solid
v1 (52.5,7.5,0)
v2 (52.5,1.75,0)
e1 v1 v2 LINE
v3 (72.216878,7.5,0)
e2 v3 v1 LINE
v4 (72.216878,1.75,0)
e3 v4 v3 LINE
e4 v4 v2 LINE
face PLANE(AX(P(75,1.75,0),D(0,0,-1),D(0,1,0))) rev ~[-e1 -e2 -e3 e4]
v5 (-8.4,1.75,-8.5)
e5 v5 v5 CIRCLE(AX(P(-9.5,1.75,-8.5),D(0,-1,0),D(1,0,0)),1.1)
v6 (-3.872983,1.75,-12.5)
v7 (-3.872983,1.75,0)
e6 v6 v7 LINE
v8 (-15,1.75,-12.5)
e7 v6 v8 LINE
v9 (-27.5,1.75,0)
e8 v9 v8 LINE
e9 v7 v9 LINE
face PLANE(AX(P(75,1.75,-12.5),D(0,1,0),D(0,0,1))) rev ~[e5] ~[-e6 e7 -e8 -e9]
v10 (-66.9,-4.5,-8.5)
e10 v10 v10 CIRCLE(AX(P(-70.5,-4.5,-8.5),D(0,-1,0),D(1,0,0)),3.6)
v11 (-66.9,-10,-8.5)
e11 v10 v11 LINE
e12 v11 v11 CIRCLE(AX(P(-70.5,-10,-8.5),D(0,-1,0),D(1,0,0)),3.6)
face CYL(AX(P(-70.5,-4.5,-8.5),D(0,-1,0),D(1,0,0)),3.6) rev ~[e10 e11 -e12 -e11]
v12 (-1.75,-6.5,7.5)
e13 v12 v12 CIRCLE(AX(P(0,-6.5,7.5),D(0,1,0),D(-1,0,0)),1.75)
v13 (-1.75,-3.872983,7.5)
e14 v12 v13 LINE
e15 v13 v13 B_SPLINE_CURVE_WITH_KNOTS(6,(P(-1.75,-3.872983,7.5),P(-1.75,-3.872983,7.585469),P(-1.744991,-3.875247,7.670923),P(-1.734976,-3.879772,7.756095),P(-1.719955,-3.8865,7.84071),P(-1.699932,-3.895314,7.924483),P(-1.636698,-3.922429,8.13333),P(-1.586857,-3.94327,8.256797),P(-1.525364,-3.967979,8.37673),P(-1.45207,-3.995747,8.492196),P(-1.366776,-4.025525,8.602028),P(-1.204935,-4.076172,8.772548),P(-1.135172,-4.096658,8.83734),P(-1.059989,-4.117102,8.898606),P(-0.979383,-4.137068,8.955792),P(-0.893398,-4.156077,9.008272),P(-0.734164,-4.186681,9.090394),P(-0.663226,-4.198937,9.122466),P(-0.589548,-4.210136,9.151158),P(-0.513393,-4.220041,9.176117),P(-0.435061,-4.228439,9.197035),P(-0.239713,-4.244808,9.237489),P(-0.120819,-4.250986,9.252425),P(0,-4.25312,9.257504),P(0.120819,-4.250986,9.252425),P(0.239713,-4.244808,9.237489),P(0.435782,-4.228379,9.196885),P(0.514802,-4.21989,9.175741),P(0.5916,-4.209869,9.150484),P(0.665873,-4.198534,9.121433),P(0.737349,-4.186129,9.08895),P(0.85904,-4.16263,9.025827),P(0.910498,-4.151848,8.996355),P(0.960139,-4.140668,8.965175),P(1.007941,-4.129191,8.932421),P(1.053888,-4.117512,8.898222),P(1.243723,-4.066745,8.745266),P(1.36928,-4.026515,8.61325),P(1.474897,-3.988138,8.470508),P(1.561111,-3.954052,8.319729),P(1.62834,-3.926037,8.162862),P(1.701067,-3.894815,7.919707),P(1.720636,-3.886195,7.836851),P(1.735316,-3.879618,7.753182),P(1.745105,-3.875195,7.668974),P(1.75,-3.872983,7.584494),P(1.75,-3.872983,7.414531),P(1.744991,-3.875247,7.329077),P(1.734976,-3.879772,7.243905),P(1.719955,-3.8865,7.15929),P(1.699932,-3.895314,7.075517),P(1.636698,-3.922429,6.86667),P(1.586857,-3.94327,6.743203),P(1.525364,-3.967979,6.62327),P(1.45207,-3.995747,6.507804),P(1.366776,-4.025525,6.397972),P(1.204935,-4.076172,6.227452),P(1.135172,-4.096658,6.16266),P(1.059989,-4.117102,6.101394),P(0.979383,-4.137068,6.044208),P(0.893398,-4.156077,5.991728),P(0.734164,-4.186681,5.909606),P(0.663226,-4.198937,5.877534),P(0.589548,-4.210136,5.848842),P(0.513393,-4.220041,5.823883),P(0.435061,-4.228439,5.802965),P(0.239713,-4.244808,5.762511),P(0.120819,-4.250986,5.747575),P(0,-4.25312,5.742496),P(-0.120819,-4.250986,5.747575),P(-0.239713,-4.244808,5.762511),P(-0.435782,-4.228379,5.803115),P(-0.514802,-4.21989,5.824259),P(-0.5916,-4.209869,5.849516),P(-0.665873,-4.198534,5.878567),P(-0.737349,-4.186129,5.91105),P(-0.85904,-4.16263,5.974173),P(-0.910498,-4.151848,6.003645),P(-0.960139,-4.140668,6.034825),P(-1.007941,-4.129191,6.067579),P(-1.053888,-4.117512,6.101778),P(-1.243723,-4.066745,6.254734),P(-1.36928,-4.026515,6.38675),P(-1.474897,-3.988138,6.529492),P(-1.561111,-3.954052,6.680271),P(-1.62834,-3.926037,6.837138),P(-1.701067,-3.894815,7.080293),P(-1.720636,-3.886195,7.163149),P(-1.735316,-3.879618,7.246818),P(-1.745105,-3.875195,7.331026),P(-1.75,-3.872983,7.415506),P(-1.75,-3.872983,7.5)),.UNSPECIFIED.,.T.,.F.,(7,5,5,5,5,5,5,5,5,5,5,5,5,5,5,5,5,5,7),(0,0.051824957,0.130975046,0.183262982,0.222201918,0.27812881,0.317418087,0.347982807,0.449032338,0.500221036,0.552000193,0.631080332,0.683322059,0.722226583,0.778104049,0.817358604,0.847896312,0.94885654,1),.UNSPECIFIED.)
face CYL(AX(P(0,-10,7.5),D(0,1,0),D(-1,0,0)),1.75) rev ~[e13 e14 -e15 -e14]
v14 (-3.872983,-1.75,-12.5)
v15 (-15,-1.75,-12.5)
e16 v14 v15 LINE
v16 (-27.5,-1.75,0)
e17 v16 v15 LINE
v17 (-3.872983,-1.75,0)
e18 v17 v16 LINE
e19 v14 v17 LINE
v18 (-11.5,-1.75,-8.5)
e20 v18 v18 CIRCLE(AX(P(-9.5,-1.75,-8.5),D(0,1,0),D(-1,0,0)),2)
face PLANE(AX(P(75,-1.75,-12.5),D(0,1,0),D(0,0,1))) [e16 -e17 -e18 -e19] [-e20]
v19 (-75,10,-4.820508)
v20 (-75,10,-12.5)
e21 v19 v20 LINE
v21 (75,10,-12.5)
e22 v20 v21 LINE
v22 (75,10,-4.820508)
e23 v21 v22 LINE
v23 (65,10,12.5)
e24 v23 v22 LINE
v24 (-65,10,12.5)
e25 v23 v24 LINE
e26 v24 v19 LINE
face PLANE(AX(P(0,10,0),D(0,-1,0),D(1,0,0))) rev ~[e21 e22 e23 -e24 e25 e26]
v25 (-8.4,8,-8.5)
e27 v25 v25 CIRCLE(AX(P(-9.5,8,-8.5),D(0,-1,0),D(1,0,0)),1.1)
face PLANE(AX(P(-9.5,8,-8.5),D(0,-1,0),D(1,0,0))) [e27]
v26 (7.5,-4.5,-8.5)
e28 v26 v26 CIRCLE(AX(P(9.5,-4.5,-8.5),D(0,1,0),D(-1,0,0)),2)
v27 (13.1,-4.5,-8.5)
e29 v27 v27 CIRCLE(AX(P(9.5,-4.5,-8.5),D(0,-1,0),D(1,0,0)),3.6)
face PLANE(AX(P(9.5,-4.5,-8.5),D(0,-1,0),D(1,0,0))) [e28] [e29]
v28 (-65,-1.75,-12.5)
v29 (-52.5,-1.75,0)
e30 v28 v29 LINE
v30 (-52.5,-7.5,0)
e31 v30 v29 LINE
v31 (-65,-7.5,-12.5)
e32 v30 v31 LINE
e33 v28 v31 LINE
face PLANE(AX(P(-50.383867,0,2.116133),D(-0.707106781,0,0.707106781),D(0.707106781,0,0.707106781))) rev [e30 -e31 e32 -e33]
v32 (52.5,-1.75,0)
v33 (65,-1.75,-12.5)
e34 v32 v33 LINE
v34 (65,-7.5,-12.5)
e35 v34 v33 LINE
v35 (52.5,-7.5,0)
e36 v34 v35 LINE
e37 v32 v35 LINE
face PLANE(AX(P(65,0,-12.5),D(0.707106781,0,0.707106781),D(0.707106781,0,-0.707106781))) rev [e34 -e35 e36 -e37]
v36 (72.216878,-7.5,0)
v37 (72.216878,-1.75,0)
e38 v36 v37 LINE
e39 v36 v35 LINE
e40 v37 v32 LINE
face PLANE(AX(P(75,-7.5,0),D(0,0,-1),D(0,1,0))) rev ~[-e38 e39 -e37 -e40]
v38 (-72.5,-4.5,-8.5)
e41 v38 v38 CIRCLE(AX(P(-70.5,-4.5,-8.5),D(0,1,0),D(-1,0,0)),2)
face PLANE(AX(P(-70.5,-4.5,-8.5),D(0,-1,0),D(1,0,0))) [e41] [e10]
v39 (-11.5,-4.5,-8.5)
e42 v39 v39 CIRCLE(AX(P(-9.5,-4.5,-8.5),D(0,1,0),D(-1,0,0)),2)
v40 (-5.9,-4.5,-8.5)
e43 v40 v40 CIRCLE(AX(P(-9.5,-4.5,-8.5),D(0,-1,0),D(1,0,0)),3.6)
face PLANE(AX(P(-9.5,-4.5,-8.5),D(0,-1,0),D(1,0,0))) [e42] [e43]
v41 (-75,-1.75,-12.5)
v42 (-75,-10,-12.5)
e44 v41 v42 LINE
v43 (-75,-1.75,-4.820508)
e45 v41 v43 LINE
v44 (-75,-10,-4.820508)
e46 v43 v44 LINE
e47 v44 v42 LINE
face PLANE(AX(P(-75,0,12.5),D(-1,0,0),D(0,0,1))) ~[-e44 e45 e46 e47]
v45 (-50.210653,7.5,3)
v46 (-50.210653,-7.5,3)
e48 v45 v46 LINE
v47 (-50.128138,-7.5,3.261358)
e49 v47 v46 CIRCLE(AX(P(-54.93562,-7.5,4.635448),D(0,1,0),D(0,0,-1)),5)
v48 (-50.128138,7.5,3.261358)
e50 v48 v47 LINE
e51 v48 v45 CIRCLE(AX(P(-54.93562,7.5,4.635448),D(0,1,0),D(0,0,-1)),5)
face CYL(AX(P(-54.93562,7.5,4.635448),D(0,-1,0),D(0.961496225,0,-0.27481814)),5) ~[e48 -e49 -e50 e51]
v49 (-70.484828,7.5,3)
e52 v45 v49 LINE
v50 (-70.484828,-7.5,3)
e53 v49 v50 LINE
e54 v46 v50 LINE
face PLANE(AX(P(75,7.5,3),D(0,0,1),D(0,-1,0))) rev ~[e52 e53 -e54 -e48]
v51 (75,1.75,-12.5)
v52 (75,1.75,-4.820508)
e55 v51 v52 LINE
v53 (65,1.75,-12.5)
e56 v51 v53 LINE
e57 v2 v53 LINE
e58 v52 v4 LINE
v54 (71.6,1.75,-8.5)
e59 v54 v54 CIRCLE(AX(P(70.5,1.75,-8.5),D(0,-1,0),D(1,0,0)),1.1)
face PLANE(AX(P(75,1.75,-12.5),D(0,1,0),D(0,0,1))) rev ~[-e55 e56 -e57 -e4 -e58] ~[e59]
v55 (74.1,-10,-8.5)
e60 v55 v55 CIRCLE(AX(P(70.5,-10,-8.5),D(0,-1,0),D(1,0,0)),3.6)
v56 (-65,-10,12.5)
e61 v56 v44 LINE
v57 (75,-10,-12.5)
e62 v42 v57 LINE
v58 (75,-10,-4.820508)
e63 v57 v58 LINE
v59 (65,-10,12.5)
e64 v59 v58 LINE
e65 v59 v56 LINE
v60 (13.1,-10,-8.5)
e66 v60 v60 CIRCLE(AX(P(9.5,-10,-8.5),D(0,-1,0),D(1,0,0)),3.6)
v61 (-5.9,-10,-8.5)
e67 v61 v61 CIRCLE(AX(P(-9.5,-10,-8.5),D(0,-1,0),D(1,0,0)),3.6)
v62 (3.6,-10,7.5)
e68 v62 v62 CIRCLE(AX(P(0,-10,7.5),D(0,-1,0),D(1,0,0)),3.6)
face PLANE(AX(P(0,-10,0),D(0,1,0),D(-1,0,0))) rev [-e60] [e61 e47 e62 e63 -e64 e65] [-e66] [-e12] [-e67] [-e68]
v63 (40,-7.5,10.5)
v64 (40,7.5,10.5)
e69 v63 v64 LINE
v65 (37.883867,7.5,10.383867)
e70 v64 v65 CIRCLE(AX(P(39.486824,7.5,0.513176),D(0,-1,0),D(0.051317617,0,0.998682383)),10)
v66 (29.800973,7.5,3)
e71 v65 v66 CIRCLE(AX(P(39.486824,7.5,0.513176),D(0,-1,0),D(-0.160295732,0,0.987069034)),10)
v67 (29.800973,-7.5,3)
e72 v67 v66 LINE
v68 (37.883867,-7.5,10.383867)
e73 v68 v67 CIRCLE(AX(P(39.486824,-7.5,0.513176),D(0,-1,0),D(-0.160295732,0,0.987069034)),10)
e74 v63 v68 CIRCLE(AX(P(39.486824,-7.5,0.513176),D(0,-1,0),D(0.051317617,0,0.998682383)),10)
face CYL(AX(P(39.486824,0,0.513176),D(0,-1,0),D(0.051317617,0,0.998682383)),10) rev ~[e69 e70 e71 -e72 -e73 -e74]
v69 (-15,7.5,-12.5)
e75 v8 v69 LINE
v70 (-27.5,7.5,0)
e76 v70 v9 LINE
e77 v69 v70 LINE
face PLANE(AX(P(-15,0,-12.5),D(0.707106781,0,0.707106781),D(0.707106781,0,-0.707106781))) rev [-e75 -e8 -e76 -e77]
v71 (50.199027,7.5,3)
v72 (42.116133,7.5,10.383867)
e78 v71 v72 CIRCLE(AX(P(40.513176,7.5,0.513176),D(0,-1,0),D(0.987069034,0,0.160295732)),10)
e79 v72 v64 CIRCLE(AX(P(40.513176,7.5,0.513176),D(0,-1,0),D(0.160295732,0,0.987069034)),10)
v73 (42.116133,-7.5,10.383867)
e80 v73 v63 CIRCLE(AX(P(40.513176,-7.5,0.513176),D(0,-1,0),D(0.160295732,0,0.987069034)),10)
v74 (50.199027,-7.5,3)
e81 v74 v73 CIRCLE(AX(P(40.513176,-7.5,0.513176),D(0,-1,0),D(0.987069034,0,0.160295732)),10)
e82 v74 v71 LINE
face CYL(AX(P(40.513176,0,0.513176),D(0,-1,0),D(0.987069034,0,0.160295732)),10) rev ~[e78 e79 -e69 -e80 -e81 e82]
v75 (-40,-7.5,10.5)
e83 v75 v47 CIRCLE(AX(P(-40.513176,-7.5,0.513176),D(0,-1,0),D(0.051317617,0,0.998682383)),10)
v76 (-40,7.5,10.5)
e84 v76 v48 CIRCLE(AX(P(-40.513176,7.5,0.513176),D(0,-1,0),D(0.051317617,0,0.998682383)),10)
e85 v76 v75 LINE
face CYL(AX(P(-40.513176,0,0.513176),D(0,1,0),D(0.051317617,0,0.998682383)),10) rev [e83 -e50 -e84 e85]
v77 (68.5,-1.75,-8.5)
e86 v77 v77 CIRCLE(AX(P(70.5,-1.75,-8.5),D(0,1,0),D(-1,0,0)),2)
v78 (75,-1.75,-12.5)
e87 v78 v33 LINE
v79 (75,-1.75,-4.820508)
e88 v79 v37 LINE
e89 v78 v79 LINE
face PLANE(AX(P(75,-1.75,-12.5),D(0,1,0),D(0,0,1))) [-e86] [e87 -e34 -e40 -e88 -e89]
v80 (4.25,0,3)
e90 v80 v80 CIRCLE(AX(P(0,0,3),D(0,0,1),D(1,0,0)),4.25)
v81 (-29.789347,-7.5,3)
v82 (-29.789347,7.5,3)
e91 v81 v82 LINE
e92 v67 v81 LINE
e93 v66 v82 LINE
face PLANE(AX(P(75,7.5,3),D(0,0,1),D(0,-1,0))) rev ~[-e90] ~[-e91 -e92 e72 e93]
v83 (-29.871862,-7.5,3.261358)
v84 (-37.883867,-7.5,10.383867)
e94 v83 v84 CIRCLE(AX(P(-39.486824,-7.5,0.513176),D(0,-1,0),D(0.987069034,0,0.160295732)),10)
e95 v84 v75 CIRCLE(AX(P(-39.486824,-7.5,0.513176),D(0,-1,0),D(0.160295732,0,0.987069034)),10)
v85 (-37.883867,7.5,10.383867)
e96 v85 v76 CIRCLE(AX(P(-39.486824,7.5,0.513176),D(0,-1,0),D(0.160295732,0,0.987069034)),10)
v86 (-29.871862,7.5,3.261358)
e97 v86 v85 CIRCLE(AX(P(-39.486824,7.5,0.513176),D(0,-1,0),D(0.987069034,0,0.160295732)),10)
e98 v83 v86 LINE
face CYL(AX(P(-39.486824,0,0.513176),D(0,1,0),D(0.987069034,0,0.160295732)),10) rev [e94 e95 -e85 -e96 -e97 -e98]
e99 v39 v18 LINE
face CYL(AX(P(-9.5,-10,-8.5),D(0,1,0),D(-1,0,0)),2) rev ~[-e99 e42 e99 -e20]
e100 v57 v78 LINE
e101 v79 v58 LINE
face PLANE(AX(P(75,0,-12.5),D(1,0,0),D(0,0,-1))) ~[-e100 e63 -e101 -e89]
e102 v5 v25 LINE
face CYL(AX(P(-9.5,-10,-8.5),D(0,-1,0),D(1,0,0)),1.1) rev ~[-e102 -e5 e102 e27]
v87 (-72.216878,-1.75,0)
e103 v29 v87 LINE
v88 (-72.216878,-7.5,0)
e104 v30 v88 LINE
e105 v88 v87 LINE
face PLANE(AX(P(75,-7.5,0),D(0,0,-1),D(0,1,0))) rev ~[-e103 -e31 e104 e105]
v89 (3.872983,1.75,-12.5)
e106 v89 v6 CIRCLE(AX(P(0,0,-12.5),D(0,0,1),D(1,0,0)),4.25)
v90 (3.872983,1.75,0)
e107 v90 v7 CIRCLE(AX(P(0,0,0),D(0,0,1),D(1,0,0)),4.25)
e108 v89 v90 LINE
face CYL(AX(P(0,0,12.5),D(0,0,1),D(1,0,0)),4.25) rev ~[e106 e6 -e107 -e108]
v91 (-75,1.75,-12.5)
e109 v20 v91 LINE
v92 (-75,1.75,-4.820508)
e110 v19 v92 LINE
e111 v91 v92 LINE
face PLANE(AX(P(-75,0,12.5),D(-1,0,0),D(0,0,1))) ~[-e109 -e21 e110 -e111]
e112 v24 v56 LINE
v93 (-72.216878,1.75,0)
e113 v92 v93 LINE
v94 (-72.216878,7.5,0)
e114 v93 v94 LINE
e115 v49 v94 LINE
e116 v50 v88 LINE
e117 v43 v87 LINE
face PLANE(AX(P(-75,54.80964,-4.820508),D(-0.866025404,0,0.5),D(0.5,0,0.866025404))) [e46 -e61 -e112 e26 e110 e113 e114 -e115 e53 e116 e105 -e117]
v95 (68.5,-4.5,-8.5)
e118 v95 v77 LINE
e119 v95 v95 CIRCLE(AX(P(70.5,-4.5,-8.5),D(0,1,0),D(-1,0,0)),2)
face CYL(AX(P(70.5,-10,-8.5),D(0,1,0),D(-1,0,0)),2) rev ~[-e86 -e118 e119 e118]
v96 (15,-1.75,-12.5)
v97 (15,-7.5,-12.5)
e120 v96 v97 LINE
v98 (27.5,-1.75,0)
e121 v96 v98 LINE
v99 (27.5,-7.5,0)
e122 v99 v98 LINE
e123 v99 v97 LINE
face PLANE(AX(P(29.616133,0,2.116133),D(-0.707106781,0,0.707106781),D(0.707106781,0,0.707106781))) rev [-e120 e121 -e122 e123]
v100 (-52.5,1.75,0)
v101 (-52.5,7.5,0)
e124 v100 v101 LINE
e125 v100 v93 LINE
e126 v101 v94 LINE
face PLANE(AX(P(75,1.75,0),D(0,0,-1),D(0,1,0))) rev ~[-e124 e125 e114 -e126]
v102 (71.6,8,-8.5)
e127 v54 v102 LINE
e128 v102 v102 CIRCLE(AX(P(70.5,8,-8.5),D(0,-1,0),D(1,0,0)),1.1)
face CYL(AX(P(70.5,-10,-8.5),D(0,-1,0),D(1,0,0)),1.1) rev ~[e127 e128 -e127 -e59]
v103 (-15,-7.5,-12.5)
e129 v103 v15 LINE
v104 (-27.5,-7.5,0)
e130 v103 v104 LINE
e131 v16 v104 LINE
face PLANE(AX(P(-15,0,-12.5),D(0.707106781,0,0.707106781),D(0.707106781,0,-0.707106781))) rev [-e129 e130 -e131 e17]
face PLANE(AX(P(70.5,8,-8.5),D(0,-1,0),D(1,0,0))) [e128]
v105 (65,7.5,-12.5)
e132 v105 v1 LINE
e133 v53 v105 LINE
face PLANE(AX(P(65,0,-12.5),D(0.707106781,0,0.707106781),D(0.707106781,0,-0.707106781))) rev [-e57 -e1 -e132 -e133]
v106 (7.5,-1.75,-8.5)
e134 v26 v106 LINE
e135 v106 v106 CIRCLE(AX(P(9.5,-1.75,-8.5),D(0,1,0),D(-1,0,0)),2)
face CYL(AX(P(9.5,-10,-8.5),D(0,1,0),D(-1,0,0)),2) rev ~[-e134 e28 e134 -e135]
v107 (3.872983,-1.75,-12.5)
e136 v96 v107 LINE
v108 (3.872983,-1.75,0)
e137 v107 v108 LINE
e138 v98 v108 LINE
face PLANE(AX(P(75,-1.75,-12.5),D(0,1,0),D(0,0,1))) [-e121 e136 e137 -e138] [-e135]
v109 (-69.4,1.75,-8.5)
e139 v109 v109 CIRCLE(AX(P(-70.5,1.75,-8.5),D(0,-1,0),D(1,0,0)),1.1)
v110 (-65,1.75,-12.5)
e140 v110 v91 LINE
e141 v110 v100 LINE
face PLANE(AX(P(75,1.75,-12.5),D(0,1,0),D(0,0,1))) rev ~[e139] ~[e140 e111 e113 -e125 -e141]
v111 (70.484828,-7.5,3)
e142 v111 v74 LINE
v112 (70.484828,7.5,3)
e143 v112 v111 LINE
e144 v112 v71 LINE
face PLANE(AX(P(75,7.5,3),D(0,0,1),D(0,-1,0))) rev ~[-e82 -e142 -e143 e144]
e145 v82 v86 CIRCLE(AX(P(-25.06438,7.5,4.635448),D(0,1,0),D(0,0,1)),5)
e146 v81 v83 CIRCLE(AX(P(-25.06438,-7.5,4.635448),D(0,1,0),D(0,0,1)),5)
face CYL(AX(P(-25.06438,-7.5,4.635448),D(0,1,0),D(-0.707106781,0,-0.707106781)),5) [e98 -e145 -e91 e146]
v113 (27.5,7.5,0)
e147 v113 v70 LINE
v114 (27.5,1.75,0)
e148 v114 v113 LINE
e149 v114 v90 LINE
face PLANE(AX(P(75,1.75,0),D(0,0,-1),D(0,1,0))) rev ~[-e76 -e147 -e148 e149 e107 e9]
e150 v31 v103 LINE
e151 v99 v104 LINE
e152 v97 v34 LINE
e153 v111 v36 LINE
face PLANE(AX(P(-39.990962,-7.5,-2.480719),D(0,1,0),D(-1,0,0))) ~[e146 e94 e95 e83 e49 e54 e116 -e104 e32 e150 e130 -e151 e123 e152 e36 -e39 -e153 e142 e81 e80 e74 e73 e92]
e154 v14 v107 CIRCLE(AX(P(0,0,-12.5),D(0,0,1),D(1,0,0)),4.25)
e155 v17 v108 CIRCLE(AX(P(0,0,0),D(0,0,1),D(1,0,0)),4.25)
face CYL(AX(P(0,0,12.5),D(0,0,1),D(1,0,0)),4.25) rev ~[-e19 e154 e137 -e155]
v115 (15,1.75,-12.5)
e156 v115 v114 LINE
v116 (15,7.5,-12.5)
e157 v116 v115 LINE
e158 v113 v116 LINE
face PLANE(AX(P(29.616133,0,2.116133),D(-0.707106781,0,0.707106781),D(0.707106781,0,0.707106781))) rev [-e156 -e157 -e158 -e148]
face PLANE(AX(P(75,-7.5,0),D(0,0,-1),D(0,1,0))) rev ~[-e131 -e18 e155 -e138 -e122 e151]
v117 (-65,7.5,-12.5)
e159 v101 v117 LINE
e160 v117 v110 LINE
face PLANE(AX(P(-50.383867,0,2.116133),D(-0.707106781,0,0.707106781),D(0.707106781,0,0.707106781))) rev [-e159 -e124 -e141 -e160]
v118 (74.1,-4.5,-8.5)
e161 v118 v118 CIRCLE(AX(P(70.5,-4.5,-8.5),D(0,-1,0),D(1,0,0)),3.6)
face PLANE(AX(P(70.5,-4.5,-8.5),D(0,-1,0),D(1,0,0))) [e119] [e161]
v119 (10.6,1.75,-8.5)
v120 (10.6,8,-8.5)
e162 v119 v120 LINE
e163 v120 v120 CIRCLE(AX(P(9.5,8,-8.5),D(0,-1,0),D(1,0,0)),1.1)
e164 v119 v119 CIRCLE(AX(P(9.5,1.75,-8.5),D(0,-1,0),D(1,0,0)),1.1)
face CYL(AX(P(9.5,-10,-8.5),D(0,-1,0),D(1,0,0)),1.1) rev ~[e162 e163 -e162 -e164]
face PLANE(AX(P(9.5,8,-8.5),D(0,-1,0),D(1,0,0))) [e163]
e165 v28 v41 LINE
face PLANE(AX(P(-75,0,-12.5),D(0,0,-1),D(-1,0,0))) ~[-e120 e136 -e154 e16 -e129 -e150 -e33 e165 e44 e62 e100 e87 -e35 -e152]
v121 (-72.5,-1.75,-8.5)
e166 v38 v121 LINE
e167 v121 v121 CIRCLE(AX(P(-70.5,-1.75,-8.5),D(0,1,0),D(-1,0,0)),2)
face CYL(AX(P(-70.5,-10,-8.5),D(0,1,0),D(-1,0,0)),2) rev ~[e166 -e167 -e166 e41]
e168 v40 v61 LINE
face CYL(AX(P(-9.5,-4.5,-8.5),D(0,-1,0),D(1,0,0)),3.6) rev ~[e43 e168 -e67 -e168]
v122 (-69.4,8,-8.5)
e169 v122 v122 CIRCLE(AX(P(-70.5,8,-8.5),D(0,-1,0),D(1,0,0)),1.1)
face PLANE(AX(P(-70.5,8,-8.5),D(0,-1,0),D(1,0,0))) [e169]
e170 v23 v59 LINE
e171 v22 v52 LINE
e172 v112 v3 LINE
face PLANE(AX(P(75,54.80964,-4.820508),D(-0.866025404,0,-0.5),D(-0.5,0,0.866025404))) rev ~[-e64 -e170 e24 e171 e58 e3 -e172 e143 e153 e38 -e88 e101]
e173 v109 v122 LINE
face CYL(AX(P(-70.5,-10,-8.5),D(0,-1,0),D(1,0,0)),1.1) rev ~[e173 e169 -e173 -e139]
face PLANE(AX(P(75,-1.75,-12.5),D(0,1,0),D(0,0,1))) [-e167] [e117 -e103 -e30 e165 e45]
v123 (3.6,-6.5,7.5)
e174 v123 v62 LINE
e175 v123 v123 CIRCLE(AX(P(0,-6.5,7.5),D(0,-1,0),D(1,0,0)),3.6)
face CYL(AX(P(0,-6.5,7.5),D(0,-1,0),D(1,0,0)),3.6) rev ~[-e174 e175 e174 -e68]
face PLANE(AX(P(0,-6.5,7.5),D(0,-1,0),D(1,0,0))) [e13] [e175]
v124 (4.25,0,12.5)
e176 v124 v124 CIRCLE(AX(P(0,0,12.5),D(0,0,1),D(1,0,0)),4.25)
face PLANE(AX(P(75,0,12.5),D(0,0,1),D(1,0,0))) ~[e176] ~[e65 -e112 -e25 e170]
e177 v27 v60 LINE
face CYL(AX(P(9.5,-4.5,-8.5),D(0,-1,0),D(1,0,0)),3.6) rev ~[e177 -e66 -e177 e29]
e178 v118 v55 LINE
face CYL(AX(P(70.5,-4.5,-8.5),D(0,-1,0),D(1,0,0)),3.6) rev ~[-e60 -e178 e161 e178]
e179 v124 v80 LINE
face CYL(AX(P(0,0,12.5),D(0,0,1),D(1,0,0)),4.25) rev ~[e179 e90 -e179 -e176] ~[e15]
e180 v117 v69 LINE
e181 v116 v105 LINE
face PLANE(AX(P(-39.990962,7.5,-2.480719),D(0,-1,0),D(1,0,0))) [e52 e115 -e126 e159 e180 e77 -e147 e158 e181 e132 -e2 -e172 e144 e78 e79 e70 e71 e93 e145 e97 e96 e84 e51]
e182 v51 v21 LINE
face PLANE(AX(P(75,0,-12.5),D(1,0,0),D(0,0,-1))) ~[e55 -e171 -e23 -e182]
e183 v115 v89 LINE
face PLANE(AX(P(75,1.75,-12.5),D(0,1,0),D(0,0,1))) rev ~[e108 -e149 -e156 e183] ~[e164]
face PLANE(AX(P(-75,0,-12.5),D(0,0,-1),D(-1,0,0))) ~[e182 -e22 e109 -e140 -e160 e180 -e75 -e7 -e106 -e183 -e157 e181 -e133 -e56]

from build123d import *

# Parameters (mm, degrees)
F1_DEPTH       = 10
F3_DEPTH       = 7.5
F5_R           = 4.25
F6_DEPTH       = 30
F8_D           = 4
F8_DEPTH       = 8.5
F8_CBORE_D     = 7.2
F8_CBORE_DEPTH = 5.5
F8_TIP         = 1.2017212381
F9_D           = 3.5
F9_DEPTH       = 7
F9_CBORE_D     = 7.2
F9_CBORE_DEPTH = 3.5
F9_TIP         = 1.0515060833
F10_R          = 5
F11_R          = 5
F12_W          = 3.5
F12_H          = 12.5
F13_DEPTH      = 150.001
F7_R           = 1.1
F14_DEPTH      = 18
F15_T1_DEPTH   = 109.6192794117
F16_T1_DEPTH   = 109.6192794117


# Not quite as in the source:
# - a fillet or chamfer that OpenCascade refuses, or shapes differently, is made with other operations: its cross-section is extruded or revolved along the edge and cut away or added


with BuildPart() as f1:
    # F0 (on Front) → F1 (new body)
    with BuildSketch(Plane.XZ):
        Polygon((75, 12.5), (-75, 12.5), (-75, -12.5), (-50.5, -12.5), (75, -12.5), align=None)
    extrude(amount=-F1_DEPTH)

    # F2 (on face) → F3 (cut)
    with BuildSketch(Plane.XZ):
        with BuildLine():
            Line((-50.5, 0), (-50.5, -12.5))
            Line((-50.5, -12.5), (-29.5, -12.5))
            Line((-29.5, -12.5), (-29.5, 0))
            ThreePointArc((-29.5, 0), (-29.5018489924, 1.0611519764), (-29.616133488, 2.116133488))
            ThreePointArc((-29.616133488, 2.116133488), (-32.4157560185, 7.5842439815), (-37.883866512, 10.383866512))
            ThreePointArc((-37.883866512, 10.383866512), (-38.9388480236, 10.4981510076), (-40, 10.5))
            ThreePointArc((-40, 10.5), (-46.7951402173, 8.2937242033), (-50.383866512, 2.116133488))
            ThreePointArc((-50.383866512, 2.116133488), (-50.4981510076, 1.0611519764), (-50.5, 0))
        make_face()
        with BuildLine():
            ThreePointArc((29.616133488, 2.116133488), (29.5018489924, 1.0611519764), (29.5, 0))
            Line((29.5, 0), (29.5, -12.5))
            Line((29.5, -12.5), (50.5, -12.5))
            Line((50.5, -12.5), (50.5, 0))
            ThreePointArc((50.5, 0), (50.4981510076, 1.0611519764), (50.383866512, 2.116133488))
            ThreePointArc((50.383866512, 2.116133488), (47.5842439815, 7.5842439815), (42.116133488, 10.383866512))
            ThreePointArc((42.116133488, 10.383866512), (41.0611519764, 10.4981510076), (40, 10.5))
            ThreePointArc((40, 10.5), (38.9388480236, 10.4981510076), (37.883866512, 10.383866512))
            ThreePointArc((37.883866512, 10.383866512), (32.4157560185, 7.5842439815), (29.616133488, 2.116133488))
        make_face()
        with BuildLine():
            Line((-65, -12.5), (-59.4149563834, -12.5))
            Line((-59.4149563834, -12.5), (-50.5, -12.5))
            Line((-50.5, -12.5), (-50.5, 0))
            ThreePointArc((-50.5, 0), (-50.4981510076, 1.0611519764), (-50.383866512, 2.116133488))
            Line((-50.383866512, 2.116133488), (-65, -12.5))
        make_face()
        Polygon((-29.5, 0), (-29.5, -12.5), (-15, -12.5), (-27.5, 0), align=None)
        with BuildLine():
            ThreePointArc((-29.616133488, 2.116133488), (-29.5018489924, 1.0611519764), (-29.5, 0))
            Line((-29.5, 0), (-27.5, 0))
            Line((-27.5, 0), (-29.616133488, 2.116133488))
        make_face()
        Polygon((27.5, 0), (15, -12.5), (17, -12.5), (19.8756534234, -12.5), (29.5, -12.5), (29.5, 0), align=None)
        with BuildLine():
            Line((29.616133488, 2.116133488), (27.5, 0))
            Line((27.5, 0), (29.5, 0))
            ThreePointArc((29.5, 0), (29.5018489924, 1.0611519764), (29.616133488, 2.116133488))
        make_face()
        with BuildLine():
            Line((50.5, 0), (52.5, 0))
            Line((52.5, 0), (50.383866512, 2.116133488))
            ThreePointArc((50.383866512, 2.116133488), (50.4981510076, 1.0611519764), (50.5, 0))
        make_face()
        Polygon((62.5, -10.8300764114), (62.5, -10), (52.5, 0), (50.5, 0), (50.5, -12.5), (62.5, -12.5), align=None)
        Polygon((62.5, -12.5), (65, -12.5), (62.5, -10), (62.5, -10.8300764114), align=None)
    extrude(amount=-F3_DEPTH, mode=Mode.SUBTRACT)

    # F4: F1 across face


with BuildPart() as f1_1:
    add(f1.part)
    add(f1.part.mirror(Plane.XZ))

    # F5 (on face) → F6 (cut)
    with BuildSketch(Plane.XY.offset(12.5)):
        Circle(F5_R)
    extrude(amount=-F6_DEPTH, mode=Mode.SUBTRACT)

    # F8
    with Locations(Plane.XZ.offset(10)):
        with Locations((-70.5, -8.5), (-9.5, -8.5), (9.5, -8.5), (70.5, -8.5)):
            CounterBoreHole(F8_D / 2, F8_CBORE_D / 2, F8_CBORE_DEPTH, depth=F8_DEPTH)
            with Locations((0, 0, -(F8_DEPTH + F8_TIP / 2))):  # 118° drill point
                Cone(0, F8_D / 2, F8_TIP, mode=Mode.SUBTRACT)

    # F9
    with Locations(Plane.XZ.offset(10)):
        with Locations((0, 7.5)):
            CounterBoreHole(F9_D / 2, F9_CBORE_D / 2, F9_CBORE_DEPTH, depth=F9_DEPTH)
            with Locations((0, 0, -(F9_DEPTH + F9_TIP / 2))):  # 118° drill point
                Cone(0, F9_D / 2, F9_TIP, mode=Mode.SUBTRACT)

    # F10
    f10_edges = [f1_1.edges().sort_by_distance(p)[0] for p in [
        (-29.616133, 0, 2.116133),
    ]]
    fillet(f10_edges, radius=F10_R)

    # F11
    f11_edges = [f1_1.edges().sort_by_distance(p)[0] for p in [
        (-50.383867, 0, 2.116133),
    ]]
    fillet(f11_edges, radius=F11_R)

    # F12 (on face) → F13 (cut, through all)
    with BuildSketch(Plane.YZ.offset(75)):
        with Locations((0, -6.25)):
            Rectangle(F12_W, F12_H)
        Polygon((-7.5, 0), (-1.75, 0), (1.75, 0), (7.5, 0), (7.5, 3), (-7.5, 3), align=None)
    extrude(amount=-F13_DEPTH, mode=Mode.SUBTRACT)

    # F7 (on face) → F14 (cut)
    with BuildSketch(Plane.XZ.offset(10)):
        with Locations((-70.5, -8.5)):
            Circle(F7_R)
        with Locations((-9.5, -8.5)):
            Circle(F7_R)
        with Locations((9.5, -8.5)):
            Circle(F7_R)
        with Locations((70.5, -8.5)):
            Circle(F7_R)
    extrude(amount=-F14_DEPTH, mode=Mode.SUBTRACT)

    # F15: chamfer of 10 x 17.3205080757 on 1 edges, made by hand

    # F15_s2 → F15_t1 (cut)
    with BuildSketch(Plane.XZ.offset(-54.8096397058)):
        Polygon((-75, -4.8205080757), (-65, 12.5), (-75, 12.5), align=None)
    extrude(amount=F15_T1_DEPTH, mode=Mode.SUBTRACT)

    # F16: chamfer of 10 x 17.3205080757 on 1 edges, made by hand

    # F16_s2 → F16_t1 (cut)
    with BuildSketch(Plane.XZ.offset(-54.8096397058)):
        Polygon((75, -4.8205080757), (65, 12.5), (75, 12.5), align=None)
    extrude(amount=F16_T1_DEPTH, mode=Mode.SUBTRACT)


solid = f1_1.part
